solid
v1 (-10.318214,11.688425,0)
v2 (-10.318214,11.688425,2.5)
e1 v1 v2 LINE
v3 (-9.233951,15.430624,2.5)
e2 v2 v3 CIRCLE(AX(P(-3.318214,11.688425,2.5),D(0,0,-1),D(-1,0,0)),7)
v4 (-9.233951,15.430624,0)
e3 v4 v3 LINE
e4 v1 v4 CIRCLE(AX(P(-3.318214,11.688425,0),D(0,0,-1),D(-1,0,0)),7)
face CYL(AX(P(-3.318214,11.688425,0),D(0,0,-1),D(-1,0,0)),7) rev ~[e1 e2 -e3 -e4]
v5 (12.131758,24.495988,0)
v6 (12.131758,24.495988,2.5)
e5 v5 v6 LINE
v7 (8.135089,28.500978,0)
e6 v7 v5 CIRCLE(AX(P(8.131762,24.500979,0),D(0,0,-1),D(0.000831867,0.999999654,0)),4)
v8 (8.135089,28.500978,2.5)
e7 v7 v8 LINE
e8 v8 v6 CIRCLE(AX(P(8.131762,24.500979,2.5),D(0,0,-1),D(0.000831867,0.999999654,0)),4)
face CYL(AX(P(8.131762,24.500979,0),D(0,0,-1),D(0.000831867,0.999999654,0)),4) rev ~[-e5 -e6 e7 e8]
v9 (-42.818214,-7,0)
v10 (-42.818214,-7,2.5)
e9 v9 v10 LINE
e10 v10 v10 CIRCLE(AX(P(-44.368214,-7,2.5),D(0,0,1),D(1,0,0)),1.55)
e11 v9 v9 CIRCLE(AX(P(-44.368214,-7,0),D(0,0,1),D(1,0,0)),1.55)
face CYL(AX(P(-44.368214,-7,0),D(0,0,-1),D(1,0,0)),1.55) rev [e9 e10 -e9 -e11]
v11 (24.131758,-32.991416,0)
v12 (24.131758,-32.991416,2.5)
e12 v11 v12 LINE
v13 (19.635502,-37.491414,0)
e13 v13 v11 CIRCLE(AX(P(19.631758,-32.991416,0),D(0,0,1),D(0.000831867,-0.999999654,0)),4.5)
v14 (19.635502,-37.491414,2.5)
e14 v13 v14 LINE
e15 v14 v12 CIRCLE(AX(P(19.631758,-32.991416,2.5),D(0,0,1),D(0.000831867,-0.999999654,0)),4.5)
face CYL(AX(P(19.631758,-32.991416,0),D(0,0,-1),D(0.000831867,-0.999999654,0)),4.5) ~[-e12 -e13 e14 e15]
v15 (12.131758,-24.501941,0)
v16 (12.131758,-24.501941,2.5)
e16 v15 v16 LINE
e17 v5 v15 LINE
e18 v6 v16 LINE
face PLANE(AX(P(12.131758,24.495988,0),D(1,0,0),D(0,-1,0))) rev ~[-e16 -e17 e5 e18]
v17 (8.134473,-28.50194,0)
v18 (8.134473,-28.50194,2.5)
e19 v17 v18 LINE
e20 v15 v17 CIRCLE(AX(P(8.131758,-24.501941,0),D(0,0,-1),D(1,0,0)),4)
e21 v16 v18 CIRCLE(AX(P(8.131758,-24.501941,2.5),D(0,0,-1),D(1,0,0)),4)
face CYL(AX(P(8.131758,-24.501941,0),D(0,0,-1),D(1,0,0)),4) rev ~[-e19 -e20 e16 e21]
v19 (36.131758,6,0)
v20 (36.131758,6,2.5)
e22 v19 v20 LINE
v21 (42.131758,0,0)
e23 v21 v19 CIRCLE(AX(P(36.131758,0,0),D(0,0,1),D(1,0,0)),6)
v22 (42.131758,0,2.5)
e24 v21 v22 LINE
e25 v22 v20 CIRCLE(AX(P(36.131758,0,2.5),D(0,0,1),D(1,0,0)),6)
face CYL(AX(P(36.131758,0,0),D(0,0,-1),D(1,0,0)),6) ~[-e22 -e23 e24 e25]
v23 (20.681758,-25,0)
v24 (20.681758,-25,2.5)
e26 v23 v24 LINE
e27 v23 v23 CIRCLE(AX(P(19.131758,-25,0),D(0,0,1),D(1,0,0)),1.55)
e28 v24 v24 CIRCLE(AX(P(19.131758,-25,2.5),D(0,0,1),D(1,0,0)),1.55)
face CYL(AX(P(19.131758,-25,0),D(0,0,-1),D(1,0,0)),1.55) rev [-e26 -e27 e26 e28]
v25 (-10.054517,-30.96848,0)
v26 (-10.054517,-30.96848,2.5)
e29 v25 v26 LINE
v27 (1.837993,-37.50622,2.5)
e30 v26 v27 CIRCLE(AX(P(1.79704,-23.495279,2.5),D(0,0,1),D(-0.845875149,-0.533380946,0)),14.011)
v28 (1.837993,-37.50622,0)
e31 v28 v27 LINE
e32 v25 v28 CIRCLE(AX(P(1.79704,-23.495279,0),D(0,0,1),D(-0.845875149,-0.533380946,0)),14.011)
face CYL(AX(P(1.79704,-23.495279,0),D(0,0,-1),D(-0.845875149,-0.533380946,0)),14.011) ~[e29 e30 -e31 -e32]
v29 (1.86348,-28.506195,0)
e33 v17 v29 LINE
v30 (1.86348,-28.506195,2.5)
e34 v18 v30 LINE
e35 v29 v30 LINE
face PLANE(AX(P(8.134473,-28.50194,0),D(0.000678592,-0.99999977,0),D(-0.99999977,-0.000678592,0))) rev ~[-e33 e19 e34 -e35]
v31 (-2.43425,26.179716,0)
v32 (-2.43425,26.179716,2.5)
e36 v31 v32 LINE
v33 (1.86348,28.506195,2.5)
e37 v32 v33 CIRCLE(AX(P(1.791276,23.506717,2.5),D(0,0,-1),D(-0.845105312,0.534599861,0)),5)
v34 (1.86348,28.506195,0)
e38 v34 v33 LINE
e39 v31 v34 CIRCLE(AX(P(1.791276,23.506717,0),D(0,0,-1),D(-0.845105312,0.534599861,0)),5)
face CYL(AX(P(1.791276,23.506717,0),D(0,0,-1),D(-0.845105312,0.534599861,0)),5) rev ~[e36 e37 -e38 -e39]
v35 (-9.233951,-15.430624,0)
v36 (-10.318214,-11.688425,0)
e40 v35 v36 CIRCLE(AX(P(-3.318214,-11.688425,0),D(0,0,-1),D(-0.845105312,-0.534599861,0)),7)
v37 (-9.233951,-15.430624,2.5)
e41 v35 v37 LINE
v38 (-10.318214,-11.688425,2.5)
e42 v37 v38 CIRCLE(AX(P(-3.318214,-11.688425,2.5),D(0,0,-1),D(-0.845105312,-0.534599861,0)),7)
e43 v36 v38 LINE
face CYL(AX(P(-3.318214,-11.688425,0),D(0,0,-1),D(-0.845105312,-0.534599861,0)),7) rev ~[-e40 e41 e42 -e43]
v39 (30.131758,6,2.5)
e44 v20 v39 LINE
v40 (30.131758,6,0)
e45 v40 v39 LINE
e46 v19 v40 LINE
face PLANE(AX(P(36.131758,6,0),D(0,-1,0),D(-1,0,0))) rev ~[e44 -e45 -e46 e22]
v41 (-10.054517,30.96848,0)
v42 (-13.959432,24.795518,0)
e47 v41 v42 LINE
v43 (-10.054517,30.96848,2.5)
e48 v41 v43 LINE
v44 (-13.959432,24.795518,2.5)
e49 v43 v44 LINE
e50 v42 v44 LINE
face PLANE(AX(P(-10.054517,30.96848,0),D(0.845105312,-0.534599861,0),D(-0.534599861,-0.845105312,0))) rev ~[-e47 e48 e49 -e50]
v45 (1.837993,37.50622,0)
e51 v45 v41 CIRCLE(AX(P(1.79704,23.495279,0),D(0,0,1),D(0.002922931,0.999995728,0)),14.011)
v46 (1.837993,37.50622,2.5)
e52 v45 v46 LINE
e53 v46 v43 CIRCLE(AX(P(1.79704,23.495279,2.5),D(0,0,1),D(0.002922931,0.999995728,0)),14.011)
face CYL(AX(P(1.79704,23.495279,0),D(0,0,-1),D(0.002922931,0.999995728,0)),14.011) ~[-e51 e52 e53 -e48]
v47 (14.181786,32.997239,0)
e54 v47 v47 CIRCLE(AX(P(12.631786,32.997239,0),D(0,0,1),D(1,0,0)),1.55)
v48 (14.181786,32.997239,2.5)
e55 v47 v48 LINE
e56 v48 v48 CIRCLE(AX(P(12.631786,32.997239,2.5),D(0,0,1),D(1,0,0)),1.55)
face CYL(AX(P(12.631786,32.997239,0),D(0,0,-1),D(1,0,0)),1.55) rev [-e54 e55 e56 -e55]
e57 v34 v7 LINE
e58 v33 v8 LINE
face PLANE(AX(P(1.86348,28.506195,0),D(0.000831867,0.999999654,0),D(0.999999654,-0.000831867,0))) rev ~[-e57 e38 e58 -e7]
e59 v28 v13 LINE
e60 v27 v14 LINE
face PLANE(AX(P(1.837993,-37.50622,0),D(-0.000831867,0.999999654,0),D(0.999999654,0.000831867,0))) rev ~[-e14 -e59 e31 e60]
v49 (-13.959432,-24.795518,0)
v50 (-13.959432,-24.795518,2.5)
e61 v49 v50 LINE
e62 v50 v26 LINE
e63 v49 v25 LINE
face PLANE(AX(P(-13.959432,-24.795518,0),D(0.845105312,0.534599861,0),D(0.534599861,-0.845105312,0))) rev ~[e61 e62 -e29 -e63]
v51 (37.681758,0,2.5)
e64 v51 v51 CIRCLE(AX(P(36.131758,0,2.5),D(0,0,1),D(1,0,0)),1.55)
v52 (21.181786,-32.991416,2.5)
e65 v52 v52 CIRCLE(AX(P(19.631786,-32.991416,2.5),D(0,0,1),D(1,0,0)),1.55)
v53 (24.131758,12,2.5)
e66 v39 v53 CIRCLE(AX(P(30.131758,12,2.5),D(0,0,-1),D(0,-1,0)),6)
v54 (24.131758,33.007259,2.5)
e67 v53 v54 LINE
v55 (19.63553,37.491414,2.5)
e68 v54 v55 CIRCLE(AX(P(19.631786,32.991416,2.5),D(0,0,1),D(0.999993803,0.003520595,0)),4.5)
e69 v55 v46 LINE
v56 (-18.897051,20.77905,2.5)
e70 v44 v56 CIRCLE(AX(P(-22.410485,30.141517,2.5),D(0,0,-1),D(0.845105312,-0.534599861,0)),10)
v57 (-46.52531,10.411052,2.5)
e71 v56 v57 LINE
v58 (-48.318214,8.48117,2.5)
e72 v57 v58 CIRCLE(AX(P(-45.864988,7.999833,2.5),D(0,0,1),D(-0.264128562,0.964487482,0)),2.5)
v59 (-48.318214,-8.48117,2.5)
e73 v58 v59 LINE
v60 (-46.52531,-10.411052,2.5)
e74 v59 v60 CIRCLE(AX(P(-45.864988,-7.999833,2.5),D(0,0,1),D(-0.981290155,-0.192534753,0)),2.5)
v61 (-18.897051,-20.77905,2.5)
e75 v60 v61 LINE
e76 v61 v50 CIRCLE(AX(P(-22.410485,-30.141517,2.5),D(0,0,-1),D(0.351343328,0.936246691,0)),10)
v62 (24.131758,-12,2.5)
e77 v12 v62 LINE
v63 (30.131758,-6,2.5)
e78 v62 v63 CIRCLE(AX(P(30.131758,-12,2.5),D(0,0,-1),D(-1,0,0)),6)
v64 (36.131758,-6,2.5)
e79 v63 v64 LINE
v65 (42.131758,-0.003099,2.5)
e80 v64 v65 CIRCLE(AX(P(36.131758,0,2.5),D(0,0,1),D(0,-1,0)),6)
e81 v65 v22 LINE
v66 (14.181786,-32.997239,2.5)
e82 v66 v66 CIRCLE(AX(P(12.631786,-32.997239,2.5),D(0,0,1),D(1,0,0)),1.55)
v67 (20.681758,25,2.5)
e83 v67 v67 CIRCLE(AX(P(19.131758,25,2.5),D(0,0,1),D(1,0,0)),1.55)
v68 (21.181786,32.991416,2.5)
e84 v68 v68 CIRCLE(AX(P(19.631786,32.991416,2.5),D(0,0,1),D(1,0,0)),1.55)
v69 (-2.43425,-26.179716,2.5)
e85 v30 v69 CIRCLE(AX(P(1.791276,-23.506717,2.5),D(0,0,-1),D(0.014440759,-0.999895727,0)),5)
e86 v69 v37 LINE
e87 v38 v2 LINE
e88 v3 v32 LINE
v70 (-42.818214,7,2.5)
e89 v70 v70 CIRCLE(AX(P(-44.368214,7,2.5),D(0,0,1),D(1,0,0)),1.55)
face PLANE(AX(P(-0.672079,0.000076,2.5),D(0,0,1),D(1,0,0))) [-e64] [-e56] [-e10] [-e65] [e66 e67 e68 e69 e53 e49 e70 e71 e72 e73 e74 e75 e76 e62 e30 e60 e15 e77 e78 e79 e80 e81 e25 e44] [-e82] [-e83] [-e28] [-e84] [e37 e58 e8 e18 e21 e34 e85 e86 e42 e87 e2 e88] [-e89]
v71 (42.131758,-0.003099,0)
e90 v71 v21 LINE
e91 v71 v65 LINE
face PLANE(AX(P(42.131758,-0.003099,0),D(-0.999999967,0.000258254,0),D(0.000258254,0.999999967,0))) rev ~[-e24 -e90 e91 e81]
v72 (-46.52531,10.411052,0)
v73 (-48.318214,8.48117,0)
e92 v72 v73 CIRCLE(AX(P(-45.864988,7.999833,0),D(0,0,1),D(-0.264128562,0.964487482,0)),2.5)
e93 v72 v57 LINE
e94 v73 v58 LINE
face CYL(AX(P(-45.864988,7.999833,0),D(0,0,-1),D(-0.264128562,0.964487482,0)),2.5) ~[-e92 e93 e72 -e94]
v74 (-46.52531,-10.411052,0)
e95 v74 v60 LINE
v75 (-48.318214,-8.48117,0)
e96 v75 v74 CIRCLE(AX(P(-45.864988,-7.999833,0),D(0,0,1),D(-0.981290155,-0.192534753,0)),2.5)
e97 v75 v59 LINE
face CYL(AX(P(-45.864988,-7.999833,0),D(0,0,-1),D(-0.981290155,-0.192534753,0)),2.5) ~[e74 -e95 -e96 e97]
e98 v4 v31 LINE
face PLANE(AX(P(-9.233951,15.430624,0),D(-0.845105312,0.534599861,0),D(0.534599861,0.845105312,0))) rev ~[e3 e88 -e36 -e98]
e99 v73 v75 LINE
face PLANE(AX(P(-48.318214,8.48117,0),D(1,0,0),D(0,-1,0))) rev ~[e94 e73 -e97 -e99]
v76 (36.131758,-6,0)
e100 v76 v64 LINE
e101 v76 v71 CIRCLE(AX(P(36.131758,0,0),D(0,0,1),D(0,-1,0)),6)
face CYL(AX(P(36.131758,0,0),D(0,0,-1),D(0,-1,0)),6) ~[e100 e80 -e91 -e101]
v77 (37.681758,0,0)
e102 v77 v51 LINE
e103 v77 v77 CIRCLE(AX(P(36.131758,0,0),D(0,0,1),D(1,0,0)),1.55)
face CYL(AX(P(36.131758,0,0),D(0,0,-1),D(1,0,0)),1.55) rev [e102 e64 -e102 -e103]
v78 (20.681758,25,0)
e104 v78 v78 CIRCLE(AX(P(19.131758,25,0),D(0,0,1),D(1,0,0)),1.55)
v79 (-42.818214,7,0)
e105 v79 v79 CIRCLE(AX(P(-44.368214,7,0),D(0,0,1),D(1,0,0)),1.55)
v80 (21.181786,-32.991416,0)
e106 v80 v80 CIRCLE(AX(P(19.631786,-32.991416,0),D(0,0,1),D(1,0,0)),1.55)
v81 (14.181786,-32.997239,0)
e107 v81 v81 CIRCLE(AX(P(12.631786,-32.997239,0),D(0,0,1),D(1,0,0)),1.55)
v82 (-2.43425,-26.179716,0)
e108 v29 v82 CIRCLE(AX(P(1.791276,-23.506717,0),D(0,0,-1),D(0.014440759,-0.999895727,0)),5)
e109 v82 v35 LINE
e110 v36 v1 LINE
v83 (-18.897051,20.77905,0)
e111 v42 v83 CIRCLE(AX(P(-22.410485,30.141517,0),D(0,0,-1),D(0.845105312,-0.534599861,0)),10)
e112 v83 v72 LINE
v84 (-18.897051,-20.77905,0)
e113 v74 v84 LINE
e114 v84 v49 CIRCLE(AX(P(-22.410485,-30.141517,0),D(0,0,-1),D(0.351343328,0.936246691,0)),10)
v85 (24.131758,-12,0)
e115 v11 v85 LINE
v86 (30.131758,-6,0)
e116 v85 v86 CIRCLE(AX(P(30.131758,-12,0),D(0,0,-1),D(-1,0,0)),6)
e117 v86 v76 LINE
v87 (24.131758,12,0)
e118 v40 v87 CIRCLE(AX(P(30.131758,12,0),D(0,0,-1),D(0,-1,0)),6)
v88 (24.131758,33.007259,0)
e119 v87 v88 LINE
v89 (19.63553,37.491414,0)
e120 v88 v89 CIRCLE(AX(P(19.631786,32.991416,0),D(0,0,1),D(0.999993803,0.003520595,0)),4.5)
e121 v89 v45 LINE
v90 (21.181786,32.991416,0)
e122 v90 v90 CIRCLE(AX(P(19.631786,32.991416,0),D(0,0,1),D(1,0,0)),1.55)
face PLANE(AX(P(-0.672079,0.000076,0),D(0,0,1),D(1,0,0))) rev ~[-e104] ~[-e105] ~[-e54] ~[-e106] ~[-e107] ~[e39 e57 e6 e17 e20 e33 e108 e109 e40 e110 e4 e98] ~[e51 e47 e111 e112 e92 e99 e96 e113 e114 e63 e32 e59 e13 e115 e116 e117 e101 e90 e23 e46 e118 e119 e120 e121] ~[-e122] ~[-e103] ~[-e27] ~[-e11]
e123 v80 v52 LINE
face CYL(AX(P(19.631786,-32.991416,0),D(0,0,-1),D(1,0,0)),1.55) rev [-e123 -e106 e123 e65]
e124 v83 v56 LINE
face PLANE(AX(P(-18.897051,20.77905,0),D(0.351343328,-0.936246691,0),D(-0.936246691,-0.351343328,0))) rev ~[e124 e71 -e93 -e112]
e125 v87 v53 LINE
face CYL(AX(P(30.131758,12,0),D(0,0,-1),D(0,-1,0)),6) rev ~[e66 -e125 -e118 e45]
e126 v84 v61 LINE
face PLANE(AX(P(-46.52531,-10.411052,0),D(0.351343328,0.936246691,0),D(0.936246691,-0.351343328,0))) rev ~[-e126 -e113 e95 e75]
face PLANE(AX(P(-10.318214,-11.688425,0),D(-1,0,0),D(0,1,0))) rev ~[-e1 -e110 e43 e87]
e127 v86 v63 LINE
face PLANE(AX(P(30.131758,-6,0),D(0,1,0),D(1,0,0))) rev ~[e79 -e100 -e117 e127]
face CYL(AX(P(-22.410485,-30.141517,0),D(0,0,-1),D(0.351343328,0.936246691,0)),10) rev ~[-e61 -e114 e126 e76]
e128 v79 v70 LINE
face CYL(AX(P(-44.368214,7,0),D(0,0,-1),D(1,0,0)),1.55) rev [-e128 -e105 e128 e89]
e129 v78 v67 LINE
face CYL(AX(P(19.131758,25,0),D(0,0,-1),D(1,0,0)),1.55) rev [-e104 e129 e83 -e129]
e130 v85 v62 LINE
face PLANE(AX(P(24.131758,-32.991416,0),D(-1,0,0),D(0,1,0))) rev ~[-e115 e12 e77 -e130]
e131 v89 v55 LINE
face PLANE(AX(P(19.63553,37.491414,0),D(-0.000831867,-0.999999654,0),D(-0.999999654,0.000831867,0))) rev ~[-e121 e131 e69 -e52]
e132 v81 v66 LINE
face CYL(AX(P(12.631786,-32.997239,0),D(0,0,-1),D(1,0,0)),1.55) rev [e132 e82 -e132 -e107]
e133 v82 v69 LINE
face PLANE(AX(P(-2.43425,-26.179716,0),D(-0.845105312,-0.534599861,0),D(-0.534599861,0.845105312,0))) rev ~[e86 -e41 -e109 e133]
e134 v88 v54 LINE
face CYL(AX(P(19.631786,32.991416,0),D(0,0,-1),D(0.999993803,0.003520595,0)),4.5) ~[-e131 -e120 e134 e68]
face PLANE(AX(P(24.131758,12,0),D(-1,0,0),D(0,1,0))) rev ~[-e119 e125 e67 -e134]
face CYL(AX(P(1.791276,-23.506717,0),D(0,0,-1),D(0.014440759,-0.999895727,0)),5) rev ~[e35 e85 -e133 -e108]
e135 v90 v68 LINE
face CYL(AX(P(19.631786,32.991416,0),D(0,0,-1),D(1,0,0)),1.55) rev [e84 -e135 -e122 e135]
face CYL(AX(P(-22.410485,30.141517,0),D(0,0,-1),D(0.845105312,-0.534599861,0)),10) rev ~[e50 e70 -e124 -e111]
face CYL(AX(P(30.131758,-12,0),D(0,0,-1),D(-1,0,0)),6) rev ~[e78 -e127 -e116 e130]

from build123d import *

# Parameters (mm, degrees)
F0_R     = 1.55
F1_DEPTH = 2.5


# Not quite as in the source:
# - ends of sketch curves that miss each other by under 0.0002 mm in the source are joined


with BuildPart() as f1:
    # F0 (on Top) → F1 (new body)
    with BuildSketch(Plane.XY):
        with BuildLine():
            Line((24.1317584196, 12.0030992724), (24.1317584196, 33.007258608))
            ThreePointArc((24.1317584196, 33.007258608), (22.8094861978, 36.1776713218), (19.6355297089, 37.4914143753))
            Line((19.6355297089, 37.4914143753), (1.8379933168, 37.5062195629))
            ThreePointArc((1.8379933168, 37.5062195629), (-4.952633867, 35.7733094677), (-10.0545165801, 30.9684798423))
            Line((-10.0545165801, 30.9684798423), (-13.9594315472, 24.7955182975))
            ThreePointArc((-13.9594315472, 24.7955182975), (-16.1001567778, 22.383955311), (-18.8970513925, 20.7790499976))
            Line((-18.8970513925, 20.7790499976), (-46.5253097099, 10.4110515716))
            ThreePointArc((-46.5253097099, 10.4110515716), (-47.6965598622, 9.7014043841), (-48.3182136925, 8.4811697487))
            Line((-48.3182136925, 8.4811697487), (-48.3182136925, -8.4811697487))
            ThreePointArc((-48.3182136925, -8.4811697487), (-47.6965598622, -9.7014043841), (-46.5253097099, -10.4110515716))
            Line((-46.5253097099, -10.4110515716), (-18.8970513925, -20.7790499976))
            ThreePointArc((-18.8970513925, -20.7790499976), (-16.1001567778, -22.383955311), (-13.9594315472, -24.7955182975))
            Line((-13.9594315472, -24.7955182975), (-10.0545165801, -30.9684798423))
            ThreePointArc((-10.0545165801, -30.9684798423), (-4.952633867, -35.7733094677), (1.8379933168, -37.5062195629))
            Line((1.8379933168, -37.5062195629), (19.635501821, -37.4914143985))
            ThreePointArc((19.635501821, -37.4914143985), (22.8150621521, -36.1720727032), (24.1317584196, -32.9914159555))
            Line((24.1317584196, -32.9914159555), (24.1317584196, -12.0030992724))
            Line((24.1317584196, -12.0030992724), (24.1317584196, -12))
            ThreePointArc((24.1317584196, -12), (25.8891177325, -7.7573593129), (30.1317584196, -6))
            Line((30.1317584196, -6), (36.1317584196, -6))
            ThreePointArc((36.1317584196, -6), (40.3733032071, -4.2437363038), (42.1317576192, -0.003099272))
            Line((42.1317576192, -0.003099272), (42.1317584196, 0))
            ThreePointArc((42.1317584196, 0), (40.3743991067, 4.2426406871), (36.1317584196, 6))
            Line((36.1317584196, 6), (30.1317584196, 6))
            ThreePointArc((30.1317584196, 6), (25.8891177325, 7.7573593129), (24.1317584196, 12))
            Line((24.1317584196, 12), (24.1317584196, 12.0030992724))
        make_face()
        with Locations((-44.3682136925, -7)):
            Circle(F0_R, mode=Mode.SUBTRACT)
        with Locations((12.6317863075, -32.997239003)):
            Circle(F0_R, mode=Mode.SUBTRACT)
        with Locations((19.1317584196, -25)):
            Circle(F0_R, mode=Mode.SUBTRACT)
        with Locations((19.6317863075, -32.9914159323)):
            Circle(F0_R, mode=Mode.SUBTRACT)
        with Locations((-44.3682136925, 7)):
            Circle(F0_R, mode=Mode.SUBTRACT)
        with BuildLine():
            Line((-9.2339508783, 15.4306240067), (-2.4342503505, 26.1797159146))
            ThreePointArc((-2.4342503505, 26.1797159146), (-0.5889861734, 27.9038009834), (1.8634800061, 28.5061952445))
            Line((1.8634800061, 28.5061952445), (8.1350890009, 28.5009780993))
            ThreePointArc((8.1350890009, 28.5009780993), (10.9631282223, 27.3264639859), (12.1317584196, 24.4959882833))
            Line((12.1317584196, 24.4959882833), (12.1317584196, -24.5019407212))
            ThreePointArc((12.1317584196, -24.5019407212), (10.9611450551, -27.3294080096), (8.1344727862, -28.5019398002))
            Line((8.1344727862, -28.5019398002), (1.8634800061, -28.5061952445))
            ThreePointArc((1.8634800061, -28.5061952445), (-0.5889861734, -27.9038009834), (-2.4342503505, -26.1797159146))
            Line((-2.4342503505, -26.1797159146), (-9.2339508783, -15.4306240067))
            ThreePointArc((-9.2339508783, -15.4306240067), (-10.0416860208, -13.6364803831), (-10.3182136925, -11.688424981))
            Line((-10.3182136925, -11.688424981), (-10.3182136925, 11.688424981))
            ThreePointArc((-10.3182136925, 11.688424981), (-10.0416860208, 13.6364803831), (-9.2339508783, 15.4306240067))
        make_face(mode=Mode.SUBTRACT)
        with Locations((36.1317584196, 0)):
            Circle(F0_R, mode=Mode.SUBTRACT)
        with Locations((19.1317584196, 25)):
            Circle(F0_R, mode=Mode.SUBTRACT)
        with Locations((12.6317863075, 32.997239003)):
            Circle(F0_R, mode=Mode.SUBTRACT)
        with Locations((19.6317863075, 32.9914159323)):
            Circle(F0_R, mode=Mode.SUBTRACT)
    extrude(amount=F1_DEPTH)


solid = f1.part
